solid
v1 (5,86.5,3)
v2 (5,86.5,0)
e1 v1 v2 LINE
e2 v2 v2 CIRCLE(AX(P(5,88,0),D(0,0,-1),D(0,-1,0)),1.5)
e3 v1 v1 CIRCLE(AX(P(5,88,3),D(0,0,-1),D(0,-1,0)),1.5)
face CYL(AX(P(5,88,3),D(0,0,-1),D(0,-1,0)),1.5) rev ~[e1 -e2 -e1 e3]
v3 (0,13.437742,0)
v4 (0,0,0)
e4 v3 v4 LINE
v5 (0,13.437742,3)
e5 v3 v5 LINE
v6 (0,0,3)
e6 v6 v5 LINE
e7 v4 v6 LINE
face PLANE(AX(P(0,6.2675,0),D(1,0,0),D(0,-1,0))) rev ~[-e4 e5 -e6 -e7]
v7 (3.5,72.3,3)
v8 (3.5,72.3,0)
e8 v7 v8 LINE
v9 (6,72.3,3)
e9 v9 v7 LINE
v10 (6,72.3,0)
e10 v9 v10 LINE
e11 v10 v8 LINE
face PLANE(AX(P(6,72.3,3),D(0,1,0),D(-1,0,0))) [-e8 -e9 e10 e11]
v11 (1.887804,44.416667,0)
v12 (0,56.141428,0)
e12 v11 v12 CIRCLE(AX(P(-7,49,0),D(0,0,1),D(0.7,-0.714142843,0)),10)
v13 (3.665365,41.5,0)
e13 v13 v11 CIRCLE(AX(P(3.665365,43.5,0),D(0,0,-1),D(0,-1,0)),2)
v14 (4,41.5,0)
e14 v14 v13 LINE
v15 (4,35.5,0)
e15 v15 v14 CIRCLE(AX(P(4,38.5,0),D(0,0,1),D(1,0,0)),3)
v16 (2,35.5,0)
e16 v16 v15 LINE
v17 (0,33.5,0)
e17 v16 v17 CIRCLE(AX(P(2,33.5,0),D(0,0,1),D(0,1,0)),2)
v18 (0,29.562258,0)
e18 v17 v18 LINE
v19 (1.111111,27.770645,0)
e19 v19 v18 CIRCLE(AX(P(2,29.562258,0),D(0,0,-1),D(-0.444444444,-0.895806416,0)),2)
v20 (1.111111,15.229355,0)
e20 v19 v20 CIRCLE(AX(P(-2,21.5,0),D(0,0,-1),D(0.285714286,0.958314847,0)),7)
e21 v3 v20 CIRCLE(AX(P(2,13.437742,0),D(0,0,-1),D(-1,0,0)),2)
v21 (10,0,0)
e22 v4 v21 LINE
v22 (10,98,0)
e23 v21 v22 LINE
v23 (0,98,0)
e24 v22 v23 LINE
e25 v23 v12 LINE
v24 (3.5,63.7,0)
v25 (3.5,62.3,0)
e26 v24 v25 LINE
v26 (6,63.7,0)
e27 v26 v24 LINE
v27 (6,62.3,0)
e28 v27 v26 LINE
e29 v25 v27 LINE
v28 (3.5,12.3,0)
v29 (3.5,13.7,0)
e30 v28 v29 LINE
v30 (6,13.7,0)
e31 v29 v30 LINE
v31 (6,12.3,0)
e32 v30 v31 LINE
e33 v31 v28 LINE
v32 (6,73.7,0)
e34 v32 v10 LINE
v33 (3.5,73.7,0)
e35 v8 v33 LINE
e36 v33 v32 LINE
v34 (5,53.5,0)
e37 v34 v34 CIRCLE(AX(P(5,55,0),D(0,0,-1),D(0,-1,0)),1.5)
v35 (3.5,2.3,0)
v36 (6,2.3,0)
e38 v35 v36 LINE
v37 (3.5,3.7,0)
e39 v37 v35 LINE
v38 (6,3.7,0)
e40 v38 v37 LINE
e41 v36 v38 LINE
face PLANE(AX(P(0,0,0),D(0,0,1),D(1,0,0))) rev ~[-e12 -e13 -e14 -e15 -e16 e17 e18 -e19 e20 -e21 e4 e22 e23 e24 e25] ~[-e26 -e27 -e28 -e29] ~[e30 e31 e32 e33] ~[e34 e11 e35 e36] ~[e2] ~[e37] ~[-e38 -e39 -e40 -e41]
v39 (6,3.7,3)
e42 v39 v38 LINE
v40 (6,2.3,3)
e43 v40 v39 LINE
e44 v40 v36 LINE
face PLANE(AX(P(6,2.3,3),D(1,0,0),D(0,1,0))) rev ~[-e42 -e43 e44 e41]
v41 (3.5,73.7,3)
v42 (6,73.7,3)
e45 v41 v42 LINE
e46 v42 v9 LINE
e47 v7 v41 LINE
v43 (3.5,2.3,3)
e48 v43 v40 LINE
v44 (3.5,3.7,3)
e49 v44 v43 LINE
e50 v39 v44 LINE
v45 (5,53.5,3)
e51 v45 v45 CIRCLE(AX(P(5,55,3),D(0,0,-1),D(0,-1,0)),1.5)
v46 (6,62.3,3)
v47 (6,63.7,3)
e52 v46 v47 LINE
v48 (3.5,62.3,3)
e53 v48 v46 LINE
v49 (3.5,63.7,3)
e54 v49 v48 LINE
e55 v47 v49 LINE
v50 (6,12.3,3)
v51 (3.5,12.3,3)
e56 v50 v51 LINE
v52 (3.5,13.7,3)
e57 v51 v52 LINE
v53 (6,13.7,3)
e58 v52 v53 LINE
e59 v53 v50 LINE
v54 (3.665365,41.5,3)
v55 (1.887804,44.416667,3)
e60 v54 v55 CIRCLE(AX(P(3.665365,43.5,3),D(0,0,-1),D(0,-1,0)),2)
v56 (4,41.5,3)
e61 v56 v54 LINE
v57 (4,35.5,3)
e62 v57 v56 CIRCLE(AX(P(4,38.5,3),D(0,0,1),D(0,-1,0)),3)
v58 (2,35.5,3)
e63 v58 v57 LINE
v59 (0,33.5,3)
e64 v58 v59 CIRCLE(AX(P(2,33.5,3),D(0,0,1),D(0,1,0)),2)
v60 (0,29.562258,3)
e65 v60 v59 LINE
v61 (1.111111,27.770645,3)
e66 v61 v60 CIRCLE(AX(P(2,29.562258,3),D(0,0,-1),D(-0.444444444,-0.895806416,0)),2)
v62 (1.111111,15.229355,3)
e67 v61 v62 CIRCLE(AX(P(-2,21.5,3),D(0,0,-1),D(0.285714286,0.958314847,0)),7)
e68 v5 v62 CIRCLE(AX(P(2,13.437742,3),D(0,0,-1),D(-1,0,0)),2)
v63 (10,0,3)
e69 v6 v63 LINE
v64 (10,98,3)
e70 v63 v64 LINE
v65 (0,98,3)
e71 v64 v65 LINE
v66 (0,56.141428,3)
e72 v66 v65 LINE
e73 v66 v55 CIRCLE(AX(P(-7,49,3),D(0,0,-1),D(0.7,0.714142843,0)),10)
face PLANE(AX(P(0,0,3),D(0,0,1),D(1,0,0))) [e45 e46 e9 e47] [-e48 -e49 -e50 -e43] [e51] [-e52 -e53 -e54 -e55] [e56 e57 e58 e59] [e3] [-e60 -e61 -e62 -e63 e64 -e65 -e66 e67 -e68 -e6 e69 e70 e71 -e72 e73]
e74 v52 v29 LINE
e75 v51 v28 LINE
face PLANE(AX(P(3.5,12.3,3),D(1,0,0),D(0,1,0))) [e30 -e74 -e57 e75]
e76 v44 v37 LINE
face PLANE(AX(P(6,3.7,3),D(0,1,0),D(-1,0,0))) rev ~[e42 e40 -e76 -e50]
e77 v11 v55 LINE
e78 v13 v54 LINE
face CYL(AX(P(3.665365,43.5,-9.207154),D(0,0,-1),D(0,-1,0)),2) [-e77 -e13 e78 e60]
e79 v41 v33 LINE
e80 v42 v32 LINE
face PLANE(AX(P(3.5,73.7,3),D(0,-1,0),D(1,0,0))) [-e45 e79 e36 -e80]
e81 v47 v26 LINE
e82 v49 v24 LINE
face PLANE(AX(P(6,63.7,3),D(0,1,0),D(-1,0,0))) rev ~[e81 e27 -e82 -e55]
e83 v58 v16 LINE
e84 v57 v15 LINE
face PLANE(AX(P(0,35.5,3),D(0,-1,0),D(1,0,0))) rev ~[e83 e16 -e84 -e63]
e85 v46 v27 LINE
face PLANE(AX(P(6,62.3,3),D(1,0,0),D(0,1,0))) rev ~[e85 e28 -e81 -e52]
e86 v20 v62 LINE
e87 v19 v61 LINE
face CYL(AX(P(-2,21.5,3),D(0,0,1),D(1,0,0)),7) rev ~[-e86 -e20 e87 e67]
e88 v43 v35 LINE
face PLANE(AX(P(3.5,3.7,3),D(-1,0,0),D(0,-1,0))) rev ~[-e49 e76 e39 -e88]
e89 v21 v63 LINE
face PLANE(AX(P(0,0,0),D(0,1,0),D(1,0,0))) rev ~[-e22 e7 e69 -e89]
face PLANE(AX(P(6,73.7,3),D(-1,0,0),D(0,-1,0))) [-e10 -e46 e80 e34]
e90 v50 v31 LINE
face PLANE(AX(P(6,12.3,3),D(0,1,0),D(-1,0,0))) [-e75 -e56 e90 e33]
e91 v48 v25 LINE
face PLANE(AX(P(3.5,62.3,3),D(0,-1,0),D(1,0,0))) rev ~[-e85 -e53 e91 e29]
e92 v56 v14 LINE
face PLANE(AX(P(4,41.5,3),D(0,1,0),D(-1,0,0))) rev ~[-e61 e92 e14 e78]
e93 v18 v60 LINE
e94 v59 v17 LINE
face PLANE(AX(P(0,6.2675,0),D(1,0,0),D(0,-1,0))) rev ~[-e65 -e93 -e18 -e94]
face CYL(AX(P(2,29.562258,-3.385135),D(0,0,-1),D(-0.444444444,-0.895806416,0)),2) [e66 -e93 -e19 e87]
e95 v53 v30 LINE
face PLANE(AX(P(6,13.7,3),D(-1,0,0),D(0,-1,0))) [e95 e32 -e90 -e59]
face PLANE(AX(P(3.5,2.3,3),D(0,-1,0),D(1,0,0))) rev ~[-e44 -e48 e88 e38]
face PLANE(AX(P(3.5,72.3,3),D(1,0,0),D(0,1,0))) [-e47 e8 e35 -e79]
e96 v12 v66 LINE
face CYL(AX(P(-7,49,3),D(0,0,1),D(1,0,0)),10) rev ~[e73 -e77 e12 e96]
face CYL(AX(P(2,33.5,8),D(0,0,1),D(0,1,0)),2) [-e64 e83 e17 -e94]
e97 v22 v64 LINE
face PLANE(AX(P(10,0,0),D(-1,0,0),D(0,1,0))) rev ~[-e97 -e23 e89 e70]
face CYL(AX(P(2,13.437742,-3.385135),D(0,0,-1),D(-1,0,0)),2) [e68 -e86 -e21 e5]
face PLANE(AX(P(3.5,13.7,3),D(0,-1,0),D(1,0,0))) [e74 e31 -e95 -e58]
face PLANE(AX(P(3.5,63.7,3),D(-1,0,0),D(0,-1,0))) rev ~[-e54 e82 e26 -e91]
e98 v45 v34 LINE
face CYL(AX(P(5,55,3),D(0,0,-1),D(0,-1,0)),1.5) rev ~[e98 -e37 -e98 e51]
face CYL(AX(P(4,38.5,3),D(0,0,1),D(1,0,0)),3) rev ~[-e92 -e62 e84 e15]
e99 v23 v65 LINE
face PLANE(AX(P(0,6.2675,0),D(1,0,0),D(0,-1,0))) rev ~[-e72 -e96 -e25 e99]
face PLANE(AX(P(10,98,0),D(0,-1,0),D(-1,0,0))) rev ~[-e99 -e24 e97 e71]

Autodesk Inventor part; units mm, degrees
ref_plane "YZ Plane" through (0, 0, 0) normal (1, 0, 0) x (0, 1, 0)
ref_plane "XZ Plane" through (0, 0, 0) normal (0, 1, 0) x (-1, 0, 0)
ref_plane "XY Plane" through (0, 0, 0) normal (0, 0, 1) x (1, 0, 0)
sketch "Sketch1" plane through (0, 0, 0) normal (0, 0, 1) x (1, 0, 0)
  line L0 (0, 0) -> (10, 0)
  line L1 (10, 0) -> (10, 98)
  line L2 (10, 98) -> (0, 98)
  line L3 (0, 98) -> (0, 0)
  line L4 (0, 9.7325) -> (6, 9.7325)
  line L5 (6, 9.7325) -> (6, 6.2675)
  line L6 (6, 6.2675) -> (0, 6.2675)
  line L7 (0, 6.2675) -> (0, 9.7325)
  line L8 (0, 69.7325) -> (6, 69.7325)
  line L9 (6, 69.7325) -> (6, 66.2675)
  line L10 (6, 66.2675) -> (0, 66.2675)
  line L11 (0, 66.2675) -> (0, 69.7325)
  dimension "d0" = 10
  dimension "d1" = 98
  dimension "d10" = 6.2675
  dimension "d11" = 3.465
  dimension "d12" = 6
  dimension "d13" = 3.465
  dimension "d14" = 28.2675
  dimension "d15" = 6
extrude "Extrusion1" add sketch "Sketch1" along normal blind 3
sketch "Sketch2" plane through (0, 0, 3) normal (0, 0, 1) x (1, 0, 0)
  line L0 (10, 0) -> (0, 0) projected
  line L1 (10, 98) -> (10, 0) projected
  line L2 (0, 98) -> (10, 98) projected
  line L3 (6, 3.7) -> (3.5, 3.7)
  line L4 (3.5, 3.7) -> (3.5, 2.3)
  line L5 (3.5, 2.3) -> (6, 2.3)
  line L6 (6, 2.3) -> (6, 3.7)
  line L7 (6, 12.3) -> (3.5, 12.3)
  line L8 (3.5, 12.3) -> (3.5, 13.7)
  line L9 (3.5, 13.7) -> (6, 13.7)
  line L10 (6, 13.7) -> (6, 12.3)
  line L11 (6, 63.7) -> (3.5, 63.7)
  line L12 (3.5, 63.7) -> (3.5, 62.3)
  line L13 (3.5, 62.3) -> (6, 62.3)
  line L14 (6, 62.3) -> (6, 63.7)
  line L15 (6, 72.3) -> (3.5, 72.3)
  line L16 (3.5, 72.3) -> (3.5, 73.7)
  line L17 (3.5, 73.7) -> (6, 73.7)
  line L18 (6, 73.7) -> (6, 72.3)
  dimension "d16" = 1.4
  dimension "d17" = 2.5
  dimension "d18" = 2.3
  dimension "d19" = 1.4
  dimension "d20" = 8.6
  dimension "d21" = 2.5
  dimension "d22" = 4
  dimension "d23" = 1.4
  dimension "d24" = 1.4
  dimension "d25" = 2.5
  dimension "d26" = 24.3
  dimension "d27" = 8.6
extrude "Extrusion2" cut sketch "Sketch2" against normal through all
sketch "草圖7" plane through (0, 0, 3) normal (0, 0, 1) x (1, 0, 0)
  line L0 (0, 98) -> (10, 98) projected
  point P0 (5, 88)
  point P1 (5, 55)
  dimension "d67" = 10
  dimension "d68" = 43
hole "孔4" at (5, 88, 3) at (5, 55, 3) direction (0, 0, -1) diameter 3 end through all
sketch "草圖8" plane through (0, 0, 3) normal (0, 0, 1) x (1, 0, 0)
  line L0 (0, 0) -> (0, 98) projected
  line L1 (10, 0) -> (0, 0) projected
  line L2 (10, 98) -> (10, 0) projected
  line L3 (0, 98) -> (10, 98) projected
  circle A0 centre (-7, 49) radius 10
  circle A1 centre (-2, 21.5) radius 7
  circle A2 centre (4, 38.5) radius 3
  line L4 (4, 41.5) -> (0, 41.5)
  line L5 (0, 41.5) -> (0, 35.5)
  line L6 (0, 35.5) -> (4, 35.5)
  line L7 (4, 35.5) -> (4, 41.5)
  point P0 (0, 66.2675)
  point P1 (0, 9.7325)
  dimension "d84" = 6
  dimension "d76" = 49
  dimension "d77" = 7
  dimension "d78" = 20
  dimension "d79" = 12
  dimension "d80" = 21.5
  dimension "d81" = 14
  dimension "d82" = 38.5
  dimension "d83" = 6
extrude "擠出4" cut sketch "草圖8" against normal through all contours L0 L4 A2 L6 | A1 L0 | L0 A1 | L7 A2 | A2 L7 | A0 L0 | L0 A0
fillet "圓角4" radius 2 5 edges at (0, 14.7918, 1.5) (0, 28.2082, 1.5) (0, 35.5, 1.5) (0, 41.5, 1.5) (0, 41.8586, 1.5)
properties part number "plastic_part_53"
